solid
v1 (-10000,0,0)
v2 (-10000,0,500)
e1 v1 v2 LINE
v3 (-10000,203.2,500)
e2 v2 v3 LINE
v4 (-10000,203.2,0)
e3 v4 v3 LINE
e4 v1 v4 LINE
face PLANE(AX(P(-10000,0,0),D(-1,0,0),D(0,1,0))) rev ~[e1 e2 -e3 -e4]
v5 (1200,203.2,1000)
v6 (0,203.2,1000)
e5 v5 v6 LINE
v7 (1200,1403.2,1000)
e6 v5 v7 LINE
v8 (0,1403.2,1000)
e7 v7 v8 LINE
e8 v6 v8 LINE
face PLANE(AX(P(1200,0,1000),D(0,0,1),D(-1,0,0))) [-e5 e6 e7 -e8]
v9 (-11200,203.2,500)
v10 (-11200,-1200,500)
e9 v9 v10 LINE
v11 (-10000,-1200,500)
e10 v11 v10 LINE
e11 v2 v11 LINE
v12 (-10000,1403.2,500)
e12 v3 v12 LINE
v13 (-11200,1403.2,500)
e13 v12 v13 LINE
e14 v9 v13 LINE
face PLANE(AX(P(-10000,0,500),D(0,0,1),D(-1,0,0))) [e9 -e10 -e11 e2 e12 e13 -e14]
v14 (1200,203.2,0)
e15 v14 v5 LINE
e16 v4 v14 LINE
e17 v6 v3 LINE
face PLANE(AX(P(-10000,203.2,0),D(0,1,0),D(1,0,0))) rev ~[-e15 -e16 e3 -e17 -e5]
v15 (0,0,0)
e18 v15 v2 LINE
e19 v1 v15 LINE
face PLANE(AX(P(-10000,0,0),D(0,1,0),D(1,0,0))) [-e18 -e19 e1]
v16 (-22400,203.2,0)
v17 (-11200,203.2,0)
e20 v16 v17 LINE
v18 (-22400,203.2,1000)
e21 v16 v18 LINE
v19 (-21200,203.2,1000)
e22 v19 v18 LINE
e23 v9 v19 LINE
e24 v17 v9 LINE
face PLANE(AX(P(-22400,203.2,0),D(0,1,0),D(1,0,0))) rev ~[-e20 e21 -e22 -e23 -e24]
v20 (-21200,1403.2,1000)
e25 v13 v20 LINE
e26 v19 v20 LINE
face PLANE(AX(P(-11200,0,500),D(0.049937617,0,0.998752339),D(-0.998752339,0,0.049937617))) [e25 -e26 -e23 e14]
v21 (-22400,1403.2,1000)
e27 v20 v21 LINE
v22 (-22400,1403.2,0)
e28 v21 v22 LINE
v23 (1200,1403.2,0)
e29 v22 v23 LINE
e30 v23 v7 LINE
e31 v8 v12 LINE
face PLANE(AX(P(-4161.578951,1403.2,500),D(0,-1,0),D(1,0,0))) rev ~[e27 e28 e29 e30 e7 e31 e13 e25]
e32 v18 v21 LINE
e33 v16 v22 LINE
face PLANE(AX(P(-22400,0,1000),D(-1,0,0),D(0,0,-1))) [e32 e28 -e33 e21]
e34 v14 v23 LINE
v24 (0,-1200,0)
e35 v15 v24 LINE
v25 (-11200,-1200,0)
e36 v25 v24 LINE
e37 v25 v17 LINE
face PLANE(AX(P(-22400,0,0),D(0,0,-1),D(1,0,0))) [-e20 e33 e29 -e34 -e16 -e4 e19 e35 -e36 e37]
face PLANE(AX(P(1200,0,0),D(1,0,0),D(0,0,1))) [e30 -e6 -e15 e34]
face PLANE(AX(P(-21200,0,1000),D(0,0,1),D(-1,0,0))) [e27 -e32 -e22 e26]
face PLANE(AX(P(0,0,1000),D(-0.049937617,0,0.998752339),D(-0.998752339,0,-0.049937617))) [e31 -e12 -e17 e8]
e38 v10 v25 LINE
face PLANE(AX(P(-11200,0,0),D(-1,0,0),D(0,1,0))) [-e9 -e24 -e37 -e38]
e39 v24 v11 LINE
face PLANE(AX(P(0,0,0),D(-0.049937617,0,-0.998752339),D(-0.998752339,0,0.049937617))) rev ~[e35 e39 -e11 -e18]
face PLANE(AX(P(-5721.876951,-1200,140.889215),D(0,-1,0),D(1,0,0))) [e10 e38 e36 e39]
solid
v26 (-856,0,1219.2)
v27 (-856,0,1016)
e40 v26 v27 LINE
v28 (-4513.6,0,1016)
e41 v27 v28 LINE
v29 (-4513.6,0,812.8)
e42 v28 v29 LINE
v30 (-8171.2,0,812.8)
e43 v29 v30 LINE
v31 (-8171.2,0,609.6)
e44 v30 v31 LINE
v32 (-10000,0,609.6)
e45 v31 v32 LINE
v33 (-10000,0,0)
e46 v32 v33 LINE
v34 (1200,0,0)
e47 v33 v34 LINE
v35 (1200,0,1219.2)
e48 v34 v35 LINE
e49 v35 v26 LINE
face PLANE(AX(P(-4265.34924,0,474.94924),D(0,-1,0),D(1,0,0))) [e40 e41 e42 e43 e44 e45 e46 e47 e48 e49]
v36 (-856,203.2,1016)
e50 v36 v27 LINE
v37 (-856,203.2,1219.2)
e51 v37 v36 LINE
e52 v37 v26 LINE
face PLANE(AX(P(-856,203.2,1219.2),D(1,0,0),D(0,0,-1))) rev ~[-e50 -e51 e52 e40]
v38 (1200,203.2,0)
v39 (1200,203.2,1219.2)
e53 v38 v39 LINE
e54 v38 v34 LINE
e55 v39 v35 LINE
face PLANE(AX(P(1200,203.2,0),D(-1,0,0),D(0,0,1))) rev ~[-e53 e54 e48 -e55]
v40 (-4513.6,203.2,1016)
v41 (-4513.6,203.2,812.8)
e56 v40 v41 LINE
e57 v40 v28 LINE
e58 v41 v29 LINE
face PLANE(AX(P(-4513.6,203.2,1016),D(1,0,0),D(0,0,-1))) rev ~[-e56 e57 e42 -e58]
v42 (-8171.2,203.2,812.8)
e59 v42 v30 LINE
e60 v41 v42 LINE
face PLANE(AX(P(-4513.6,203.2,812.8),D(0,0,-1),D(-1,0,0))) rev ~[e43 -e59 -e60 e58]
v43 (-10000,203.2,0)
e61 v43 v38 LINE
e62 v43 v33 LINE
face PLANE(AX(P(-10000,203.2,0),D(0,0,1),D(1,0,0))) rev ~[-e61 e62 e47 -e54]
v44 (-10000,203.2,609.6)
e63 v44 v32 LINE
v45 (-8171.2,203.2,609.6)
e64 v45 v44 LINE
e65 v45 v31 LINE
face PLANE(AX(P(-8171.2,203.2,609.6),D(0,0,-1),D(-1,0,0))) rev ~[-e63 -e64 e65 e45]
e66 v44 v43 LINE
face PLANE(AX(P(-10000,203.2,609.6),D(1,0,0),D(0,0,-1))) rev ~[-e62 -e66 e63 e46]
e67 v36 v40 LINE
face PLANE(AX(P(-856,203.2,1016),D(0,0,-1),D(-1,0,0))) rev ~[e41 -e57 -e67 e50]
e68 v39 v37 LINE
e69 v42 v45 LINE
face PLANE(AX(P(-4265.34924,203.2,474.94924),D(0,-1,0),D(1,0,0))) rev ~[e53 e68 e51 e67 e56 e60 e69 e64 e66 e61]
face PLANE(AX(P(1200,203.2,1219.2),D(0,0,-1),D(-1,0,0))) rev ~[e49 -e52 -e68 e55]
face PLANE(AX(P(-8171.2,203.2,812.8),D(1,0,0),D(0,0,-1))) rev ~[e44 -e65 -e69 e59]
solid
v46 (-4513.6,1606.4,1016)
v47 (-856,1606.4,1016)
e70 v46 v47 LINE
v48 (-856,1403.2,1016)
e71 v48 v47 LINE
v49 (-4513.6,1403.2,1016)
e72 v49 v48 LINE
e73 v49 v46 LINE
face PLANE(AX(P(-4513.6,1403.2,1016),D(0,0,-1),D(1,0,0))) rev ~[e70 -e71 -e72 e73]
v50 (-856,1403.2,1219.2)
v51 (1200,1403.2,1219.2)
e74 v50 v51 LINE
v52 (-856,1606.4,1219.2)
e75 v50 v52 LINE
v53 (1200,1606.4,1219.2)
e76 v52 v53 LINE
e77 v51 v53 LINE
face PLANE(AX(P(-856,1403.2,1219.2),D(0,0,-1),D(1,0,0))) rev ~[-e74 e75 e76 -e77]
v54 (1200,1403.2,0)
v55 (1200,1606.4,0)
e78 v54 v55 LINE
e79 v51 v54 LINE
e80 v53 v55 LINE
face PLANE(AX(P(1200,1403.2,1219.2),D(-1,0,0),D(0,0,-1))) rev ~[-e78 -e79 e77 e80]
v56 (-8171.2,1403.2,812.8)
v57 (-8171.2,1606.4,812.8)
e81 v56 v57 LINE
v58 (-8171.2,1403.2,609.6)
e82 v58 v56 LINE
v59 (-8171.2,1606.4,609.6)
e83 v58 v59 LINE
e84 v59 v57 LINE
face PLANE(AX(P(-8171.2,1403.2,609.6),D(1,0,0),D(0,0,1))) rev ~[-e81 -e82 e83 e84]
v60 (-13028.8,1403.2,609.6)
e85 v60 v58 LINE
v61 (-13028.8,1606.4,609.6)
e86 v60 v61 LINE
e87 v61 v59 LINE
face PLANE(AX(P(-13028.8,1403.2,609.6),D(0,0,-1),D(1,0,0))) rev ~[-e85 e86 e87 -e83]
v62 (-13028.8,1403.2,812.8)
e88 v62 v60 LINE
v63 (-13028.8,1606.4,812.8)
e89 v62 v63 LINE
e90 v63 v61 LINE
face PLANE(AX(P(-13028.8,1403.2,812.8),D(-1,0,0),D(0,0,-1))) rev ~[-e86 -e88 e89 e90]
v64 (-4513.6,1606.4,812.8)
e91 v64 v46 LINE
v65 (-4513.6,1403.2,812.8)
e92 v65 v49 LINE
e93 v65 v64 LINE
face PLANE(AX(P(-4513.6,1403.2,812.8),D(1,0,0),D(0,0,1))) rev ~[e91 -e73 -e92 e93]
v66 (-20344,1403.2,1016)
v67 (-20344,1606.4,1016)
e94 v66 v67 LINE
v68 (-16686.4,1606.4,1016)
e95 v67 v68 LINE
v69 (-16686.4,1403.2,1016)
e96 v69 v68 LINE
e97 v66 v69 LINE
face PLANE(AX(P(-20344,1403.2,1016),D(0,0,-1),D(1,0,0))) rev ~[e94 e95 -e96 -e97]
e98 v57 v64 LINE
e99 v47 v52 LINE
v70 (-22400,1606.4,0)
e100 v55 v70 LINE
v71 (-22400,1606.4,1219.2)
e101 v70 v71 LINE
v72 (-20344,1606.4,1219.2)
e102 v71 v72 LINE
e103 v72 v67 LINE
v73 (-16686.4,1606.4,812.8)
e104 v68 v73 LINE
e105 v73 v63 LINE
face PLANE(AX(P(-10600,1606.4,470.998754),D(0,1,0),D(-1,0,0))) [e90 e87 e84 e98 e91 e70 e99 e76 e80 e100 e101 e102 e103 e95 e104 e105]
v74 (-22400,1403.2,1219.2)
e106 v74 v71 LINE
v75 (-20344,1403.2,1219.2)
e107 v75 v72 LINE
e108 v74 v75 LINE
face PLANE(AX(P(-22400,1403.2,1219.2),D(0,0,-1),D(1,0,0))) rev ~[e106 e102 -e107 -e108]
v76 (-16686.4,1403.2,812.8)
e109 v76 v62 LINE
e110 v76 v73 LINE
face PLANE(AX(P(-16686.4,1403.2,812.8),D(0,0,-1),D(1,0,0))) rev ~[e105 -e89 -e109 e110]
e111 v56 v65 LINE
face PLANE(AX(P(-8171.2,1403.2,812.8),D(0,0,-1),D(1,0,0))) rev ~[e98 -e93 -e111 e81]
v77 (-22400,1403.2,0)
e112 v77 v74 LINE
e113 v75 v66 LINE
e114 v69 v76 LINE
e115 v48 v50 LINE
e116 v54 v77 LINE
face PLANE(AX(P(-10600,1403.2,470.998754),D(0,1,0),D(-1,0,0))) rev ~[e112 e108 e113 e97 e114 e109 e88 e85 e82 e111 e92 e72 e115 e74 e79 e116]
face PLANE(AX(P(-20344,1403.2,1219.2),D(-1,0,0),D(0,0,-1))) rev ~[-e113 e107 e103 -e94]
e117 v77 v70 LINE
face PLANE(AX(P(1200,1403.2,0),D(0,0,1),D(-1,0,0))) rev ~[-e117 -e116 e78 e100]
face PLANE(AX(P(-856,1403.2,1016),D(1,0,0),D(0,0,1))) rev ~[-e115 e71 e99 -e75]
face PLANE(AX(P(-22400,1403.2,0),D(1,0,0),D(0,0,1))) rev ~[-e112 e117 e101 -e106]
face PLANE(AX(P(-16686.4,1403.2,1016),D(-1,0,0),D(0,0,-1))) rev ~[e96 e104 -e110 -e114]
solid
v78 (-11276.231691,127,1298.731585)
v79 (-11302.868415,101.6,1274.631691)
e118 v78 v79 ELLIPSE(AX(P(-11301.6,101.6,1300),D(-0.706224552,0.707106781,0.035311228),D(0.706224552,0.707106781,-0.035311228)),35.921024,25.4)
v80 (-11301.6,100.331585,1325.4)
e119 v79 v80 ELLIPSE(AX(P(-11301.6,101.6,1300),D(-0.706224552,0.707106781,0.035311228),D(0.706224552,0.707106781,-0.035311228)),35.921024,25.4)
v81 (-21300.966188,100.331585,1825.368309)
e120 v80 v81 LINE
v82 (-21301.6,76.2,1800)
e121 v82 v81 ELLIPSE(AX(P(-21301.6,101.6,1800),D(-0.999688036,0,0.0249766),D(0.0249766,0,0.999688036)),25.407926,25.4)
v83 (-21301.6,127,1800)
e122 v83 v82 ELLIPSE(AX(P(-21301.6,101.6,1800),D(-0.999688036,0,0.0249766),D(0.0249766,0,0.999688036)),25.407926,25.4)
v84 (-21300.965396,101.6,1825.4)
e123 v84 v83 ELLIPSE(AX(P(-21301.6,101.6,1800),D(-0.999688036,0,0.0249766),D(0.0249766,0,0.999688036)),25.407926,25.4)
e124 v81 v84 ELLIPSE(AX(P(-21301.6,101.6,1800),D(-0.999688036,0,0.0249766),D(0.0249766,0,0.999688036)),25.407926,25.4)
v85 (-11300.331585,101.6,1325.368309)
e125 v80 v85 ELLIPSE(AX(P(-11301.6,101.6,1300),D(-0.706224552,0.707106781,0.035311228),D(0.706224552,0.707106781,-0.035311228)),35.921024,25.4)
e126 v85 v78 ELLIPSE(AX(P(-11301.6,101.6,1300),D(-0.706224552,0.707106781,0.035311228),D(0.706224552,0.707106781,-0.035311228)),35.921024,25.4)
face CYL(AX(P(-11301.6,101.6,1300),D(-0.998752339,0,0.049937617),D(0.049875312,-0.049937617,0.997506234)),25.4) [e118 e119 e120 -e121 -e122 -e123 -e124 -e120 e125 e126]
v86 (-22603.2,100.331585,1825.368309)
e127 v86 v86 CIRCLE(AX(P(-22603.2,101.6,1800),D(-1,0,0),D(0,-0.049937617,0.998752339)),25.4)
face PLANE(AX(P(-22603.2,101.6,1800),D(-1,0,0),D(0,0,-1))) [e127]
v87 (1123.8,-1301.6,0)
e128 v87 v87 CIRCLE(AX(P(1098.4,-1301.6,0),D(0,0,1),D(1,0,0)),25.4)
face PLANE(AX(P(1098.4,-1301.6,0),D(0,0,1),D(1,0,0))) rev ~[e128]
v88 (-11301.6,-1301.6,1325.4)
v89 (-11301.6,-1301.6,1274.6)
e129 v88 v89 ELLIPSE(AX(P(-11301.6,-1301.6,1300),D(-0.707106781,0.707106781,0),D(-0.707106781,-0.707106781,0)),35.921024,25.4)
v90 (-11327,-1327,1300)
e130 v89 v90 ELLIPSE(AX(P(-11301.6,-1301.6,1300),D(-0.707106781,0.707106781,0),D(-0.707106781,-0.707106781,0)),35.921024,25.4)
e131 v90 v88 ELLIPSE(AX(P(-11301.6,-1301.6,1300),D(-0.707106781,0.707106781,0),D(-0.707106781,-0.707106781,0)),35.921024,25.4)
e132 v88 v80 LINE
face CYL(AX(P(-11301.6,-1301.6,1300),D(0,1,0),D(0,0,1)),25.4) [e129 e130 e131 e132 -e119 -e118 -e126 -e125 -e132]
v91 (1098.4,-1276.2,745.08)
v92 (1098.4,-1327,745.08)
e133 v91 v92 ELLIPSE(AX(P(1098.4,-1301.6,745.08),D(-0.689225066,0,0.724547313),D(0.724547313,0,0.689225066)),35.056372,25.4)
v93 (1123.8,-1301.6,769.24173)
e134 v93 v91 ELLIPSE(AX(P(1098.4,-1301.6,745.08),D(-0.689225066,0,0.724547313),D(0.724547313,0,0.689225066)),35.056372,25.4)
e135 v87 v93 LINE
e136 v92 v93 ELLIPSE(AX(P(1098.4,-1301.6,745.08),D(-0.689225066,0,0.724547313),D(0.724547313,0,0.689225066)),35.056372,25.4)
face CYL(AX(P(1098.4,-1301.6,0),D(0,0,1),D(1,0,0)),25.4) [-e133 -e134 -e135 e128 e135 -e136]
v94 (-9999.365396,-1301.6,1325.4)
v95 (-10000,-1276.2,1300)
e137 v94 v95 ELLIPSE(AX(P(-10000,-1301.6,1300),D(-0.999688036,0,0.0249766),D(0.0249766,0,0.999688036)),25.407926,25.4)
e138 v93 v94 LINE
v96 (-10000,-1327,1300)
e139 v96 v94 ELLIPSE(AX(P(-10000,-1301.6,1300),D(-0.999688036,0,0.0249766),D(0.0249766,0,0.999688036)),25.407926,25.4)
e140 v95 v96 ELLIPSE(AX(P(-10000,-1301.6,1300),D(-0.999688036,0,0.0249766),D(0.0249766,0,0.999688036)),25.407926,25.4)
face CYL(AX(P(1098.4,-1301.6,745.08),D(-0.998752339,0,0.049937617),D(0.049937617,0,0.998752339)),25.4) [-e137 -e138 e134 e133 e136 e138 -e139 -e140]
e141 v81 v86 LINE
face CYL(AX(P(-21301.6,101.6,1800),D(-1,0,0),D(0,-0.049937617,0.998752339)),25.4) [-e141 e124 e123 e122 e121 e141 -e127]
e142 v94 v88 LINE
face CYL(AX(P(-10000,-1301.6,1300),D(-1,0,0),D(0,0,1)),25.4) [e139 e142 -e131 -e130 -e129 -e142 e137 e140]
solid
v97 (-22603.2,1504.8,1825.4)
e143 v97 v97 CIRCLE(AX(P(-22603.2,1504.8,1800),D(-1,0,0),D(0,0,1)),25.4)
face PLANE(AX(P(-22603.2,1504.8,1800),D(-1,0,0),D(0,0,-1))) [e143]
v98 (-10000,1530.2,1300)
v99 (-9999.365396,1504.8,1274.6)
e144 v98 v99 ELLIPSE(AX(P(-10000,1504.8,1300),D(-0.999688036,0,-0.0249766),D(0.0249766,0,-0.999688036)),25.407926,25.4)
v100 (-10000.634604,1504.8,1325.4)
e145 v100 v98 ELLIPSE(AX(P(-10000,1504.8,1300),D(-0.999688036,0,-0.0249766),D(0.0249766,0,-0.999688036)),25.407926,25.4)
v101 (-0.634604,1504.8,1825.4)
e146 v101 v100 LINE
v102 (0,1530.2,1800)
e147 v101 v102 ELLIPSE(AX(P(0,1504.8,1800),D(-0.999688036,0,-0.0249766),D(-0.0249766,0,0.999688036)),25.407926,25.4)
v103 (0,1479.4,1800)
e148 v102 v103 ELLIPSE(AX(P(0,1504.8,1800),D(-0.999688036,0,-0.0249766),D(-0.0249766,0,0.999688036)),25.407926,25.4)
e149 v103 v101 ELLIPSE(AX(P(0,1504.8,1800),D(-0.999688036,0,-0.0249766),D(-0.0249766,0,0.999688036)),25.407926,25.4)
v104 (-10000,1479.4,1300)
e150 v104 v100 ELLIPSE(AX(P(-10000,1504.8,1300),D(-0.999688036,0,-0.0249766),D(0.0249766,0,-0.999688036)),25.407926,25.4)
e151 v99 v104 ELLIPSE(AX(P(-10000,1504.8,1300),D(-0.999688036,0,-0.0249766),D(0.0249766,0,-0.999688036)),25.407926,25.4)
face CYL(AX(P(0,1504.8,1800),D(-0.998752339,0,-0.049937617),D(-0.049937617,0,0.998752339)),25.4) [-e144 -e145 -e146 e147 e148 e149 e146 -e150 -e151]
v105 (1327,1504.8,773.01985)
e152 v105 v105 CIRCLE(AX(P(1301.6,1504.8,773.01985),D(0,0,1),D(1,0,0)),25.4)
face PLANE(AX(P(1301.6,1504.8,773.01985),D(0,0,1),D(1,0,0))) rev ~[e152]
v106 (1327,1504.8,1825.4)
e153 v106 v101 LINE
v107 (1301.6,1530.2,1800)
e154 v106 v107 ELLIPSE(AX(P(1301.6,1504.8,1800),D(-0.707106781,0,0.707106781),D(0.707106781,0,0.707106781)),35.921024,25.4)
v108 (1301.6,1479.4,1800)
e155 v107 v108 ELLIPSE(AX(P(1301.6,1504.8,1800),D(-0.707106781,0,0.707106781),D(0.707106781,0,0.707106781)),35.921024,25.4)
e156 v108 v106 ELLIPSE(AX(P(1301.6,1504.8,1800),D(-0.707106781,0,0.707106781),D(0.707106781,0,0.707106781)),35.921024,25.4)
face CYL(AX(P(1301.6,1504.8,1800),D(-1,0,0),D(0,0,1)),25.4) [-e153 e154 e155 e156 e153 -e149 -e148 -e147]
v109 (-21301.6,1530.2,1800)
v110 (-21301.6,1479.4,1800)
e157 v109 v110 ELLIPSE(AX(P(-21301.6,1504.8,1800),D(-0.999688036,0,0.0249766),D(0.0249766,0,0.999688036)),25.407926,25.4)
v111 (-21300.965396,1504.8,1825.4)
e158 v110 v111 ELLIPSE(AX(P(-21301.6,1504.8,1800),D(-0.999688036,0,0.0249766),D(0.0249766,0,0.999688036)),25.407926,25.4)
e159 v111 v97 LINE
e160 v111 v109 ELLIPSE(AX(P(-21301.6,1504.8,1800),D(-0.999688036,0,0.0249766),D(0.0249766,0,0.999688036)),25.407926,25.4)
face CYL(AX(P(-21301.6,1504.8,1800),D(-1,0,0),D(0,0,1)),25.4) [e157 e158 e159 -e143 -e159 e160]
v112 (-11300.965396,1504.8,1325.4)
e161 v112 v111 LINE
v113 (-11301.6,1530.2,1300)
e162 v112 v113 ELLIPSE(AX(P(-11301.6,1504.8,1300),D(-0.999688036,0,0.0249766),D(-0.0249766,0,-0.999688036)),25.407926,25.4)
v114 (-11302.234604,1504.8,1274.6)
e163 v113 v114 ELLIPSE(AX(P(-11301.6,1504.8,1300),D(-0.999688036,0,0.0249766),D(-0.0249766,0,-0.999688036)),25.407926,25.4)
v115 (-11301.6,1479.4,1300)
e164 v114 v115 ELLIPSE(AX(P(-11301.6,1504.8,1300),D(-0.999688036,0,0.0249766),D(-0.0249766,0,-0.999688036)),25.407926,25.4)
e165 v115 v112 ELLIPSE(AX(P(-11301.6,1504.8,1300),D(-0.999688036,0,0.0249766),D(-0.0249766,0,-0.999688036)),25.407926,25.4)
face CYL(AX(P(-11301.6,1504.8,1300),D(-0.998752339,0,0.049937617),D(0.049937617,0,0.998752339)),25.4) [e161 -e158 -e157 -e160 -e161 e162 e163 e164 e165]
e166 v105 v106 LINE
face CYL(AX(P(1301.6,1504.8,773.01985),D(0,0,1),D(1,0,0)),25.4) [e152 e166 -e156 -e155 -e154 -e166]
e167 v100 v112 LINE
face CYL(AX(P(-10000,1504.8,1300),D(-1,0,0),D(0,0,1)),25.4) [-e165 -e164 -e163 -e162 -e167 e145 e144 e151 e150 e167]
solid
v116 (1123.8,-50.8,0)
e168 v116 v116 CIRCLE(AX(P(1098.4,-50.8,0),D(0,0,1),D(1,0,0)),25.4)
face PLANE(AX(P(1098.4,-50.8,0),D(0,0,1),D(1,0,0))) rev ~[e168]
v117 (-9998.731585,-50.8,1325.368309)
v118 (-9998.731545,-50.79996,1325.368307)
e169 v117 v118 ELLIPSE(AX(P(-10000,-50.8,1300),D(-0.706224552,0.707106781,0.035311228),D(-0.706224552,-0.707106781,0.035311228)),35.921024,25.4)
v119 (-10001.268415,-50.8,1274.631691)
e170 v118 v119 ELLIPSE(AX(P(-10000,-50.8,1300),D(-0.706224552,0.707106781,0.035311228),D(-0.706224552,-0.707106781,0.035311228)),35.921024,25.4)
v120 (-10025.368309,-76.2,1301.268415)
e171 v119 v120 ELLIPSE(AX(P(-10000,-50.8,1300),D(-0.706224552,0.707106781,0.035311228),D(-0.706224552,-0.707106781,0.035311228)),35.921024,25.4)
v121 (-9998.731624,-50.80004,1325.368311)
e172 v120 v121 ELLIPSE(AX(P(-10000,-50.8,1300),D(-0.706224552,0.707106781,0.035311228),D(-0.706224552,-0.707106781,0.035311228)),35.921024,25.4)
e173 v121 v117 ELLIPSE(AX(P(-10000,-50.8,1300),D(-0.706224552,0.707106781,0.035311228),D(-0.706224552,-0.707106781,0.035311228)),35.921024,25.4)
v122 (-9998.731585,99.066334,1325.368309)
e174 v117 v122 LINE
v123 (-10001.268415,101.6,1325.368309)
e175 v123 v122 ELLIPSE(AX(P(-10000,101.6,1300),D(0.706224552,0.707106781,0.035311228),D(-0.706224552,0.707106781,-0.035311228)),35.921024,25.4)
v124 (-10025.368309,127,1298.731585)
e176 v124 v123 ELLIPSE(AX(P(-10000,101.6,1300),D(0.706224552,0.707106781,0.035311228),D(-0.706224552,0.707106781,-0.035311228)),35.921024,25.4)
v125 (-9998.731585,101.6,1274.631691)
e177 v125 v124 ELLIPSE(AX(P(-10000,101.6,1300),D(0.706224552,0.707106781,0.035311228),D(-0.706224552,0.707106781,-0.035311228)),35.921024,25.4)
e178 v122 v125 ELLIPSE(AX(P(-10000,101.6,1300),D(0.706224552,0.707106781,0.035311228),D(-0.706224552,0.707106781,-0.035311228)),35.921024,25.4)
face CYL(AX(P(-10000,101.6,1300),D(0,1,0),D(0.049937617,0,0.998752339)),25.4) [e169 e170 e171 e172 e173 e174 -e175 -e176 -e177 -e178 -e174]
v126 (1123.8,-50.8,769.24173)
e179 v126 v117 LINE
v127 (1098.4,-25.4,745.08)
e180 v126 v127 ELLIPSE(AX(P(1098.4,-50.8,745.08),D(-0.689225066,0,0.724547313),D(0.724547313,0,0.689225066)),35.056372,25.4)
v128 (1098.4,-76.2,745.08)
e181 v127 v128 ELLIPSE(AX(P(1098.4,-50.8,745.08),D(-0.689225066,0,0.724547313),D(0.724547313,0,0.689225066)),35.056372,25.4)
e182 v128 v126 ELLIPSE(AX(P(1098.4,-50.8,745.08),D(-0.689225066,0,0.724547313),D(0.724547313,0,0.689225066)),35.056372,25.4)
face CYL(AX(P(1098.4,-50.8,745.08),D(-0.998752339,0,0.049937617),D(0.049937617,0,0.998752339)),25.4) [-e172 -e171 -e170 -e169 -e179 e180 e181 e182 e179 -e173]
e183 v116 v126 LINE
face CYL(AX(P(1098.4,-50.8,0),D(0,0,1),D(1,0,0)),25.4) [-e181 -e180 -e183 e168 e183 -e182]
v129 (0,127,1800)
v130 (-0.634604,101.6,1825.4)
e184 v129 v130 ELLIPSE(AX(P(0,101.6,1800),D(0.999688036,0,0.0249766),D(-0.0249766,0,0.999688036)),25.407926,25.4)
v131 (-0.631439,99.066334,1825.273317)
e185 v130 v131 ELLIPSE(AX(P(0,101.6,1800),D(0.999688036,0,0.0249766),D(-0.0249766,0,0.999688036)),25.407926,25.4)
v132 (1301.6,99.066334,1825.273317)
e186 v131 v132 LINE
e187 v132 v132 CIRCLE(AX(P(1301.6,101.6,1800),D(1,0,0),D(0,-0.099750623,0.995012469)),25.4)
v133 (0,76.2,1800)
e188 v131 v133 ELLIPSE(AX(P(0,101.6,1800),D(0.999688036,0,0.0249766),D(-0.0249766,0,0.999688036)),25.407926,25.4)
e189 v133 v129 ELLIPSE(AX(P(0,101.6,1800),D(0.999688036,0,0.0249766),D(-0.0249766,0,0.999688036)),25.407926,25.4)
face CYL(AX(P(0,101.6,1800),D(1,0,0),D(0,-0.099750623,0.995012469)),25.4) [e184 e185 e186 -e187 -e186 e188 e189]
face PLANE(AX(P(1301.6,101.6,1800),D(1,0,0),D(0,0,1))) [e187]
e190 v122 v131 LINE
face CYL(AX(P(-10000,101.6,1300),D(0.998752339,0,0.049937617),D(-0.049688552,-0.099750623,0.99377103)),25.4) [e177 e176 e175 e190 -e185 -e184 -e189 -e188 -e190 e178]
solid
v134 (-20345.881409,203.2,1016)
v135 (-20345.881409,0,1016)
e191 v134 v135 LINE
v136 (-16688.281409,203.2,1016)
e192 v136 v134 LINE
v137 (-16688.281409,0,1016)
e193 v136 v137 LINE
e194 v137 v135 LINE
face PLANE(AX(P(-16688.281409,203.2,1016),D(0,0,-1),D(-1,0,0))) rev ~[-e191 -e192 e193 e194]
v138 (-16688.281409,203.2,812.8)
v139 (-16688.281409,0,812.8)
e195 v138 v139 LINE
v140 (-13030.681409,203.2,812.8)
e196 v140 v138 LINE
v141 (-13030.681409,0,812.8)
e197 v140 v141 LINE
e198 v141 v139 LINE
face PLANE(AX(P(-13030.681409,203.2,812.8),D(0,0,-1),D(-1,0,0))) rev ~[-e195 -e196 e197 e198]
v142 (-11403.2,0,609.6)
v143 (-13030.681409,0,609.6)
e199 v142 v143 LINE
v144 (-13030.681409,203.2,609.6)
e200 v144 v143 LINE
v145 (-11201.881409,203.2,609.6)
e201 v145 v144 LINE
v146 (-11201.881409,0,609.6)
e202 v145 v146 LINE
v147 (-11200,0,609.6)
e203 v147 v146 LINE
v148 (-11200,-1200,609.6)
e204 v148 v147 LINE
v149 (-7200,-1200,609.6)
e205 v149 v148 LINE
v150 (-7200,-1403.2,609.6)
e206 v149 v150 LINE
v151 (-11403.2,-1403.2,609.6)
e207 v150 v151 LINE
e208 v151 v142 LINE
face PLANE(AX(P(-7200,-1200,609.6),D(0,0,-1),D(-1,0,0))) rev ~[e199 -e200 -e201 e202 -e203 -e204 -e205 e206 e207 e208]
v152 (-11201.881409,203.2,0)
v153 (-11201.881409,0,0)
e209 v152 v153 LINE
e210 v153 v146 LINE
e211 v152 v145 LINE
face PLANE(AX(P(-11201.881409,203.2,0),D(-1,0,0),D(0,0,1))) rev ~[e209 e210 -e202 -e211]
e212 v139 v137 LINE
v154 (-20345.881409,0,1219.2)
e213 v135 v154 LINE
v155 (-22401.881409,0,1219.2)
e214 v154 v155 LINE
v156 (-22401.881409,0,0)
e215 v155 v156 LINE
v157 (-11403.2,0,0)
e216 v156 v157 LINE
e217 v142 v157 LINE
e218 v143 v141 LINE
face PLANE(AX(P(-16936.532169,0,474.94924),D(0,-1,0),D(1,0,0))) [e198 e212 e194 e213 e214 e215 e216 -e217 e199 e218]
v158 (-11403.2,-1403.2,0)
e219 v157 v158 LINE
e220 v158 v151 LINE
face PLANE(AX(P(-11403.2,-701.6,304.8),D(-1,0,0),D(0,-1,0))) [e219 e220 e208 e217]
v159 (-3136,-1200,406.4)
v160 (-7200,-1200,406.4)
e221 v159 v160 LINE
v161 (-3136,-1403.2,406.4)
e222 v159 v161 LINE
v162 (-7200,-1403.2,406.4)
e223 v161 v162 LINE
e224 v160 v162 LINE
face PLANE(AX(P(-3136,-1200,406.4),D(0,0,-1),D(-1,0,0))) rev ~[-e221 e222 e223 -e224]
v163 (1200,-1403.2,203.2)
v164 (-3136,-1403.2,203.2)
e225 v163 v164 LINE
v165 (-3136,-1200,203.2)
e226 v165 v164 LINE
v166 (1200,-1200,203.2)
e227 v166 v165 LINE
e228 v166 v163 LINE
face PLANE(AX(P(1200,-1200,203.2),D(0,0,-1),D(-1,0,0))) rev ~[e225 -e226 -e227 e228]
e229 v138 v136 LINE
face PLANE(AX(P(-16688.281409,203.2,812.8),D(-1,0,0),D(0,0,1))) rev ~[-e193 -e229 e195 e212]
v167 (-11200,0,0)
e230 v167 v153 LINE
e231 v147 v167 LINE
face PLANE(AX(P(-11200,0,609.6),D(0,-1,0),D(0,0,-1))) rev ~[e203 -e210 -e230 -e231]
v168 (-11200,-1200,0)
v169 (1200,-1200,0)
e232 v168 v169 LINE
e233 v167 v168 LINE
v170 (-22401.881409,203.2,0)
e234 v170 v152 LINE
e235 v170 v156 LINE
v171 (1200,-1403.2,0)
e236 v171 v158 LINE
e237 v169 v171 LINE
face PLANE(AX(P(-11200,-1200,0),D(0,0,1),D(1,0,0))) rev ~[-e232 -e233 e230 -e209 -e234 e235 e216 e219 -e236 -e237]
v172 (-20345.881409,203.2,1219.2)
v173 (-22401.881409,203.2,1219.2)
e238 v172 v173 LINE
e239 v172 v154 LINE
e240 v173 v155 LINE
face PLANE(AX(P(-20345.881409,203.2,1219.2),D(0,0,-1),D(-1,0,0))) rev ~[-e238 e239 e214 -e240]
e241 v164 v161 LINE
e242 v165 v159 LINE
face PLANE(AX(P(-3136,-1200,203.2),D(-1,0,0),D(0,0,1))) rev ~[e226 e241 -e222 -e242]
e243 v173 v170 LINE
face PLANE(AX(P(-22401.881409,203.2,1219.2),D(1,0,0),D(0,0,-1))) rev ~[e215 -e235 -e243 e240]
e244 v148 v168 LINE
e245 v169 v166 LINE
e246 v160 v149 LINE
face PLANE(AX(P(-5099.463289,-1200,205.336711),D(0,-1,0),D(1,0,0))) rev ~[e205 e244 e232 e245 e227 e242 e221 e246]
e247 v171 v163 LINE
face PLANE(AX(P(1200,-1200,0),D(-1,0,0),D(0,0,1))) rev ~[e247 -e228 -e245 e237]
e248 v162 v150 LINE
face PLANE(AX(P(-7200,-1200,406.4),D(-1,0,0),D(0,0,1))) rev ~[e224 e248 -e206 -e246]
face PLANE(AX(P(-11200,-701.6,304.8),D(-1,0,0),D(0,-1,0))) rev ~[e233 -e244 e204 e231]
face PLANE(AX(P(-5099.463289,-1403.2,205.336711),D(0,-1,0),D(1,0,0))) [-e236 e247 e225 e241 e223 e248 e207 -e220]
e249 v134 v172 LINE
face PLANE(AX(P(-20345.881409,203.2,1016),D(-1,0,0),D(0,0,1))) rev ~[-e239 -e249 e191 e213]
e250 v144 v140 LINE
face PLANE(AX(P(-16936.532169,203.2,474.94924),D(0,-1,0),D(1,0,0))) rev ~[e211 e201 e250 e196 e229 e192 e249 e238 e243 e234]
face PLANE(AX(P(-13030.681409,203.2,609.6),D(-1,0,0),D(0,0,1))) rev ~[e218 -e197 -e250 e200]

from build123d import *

# Parameters (mm, degrees)
F1_DEPTH  = 1200
F2_DEPTH  = 1403.2
F3_W      = 11200
F3_H      = 203.2
F4_DEPTH  = 1000.001
F7_DEPTH  = 203.2
F9_DEPTH  = 203.2
F11_DEPTH = 203.2
F13_DEPTH = 203.2
F24_R     = 25.4
F26_R     = 25.4
F29_R     = 25.4


# Not quite as in the source:
# - the program builds the solid bodies; features that only make, move or delete a surface that nothing else refers to are left out


with BuildPart() as f1:
    # F0 (on Front) → F1 (new body)
    with BuildSketch(Plane.XZ):
        Polygon((-10000, 0), (0, 0), (-10000, 500), (-11200, 500), (-11200, 0), align=None)
    extrude(amount=F1_DEPTH)

    # F0 (on Front) → F2 (join)
    with BuildSketch(Plane.XZ):
        Polygon((-10000, 500), (0, 0), (1200, 0), (1200, 1000), (0, 1000), align=None)
        Polygon((-10000, 0), (0, 0), (-10000, 500), (-11200, 500), (-11200, 0), align=None)
        Polygon((-21200, 0), (-11200, 0), (-11200, 500), (-21200, 1000), (-22400, 1000), (-22400, 0), align=None)
    extrude(amount=-F2_DEPTH)

    # F3 (on Top) → F4 (cut, through all)
    with BuildSketch(Plane.XY):
        with Locations((-4400, 101.6)):
            Rectangle(F3_W, F3_H)
        with Locations((-16800, 101.6)):
            Rectangle(F3_W, F3_H)
    extrude(amount=F4_DEPTH, mode=Mode.SUBTRACT)


with BuildPart() as f7:
    # F6 (on face) → F7 (new body)
    with BuildSketch(Plane.XZ.offset(-203.2)):
        Polygon((-10000, 609.6), (-10000, 0), (1200, 0), (1200, 1219.2), (-856, 1219.2), (-856, 1016), (-4513.6, 1016), (-4513.6, 812.8), (-8171.2, 812.8), (-8171.2, 609.6), align=None)
    extrude(amount=F7_DEPTH)


with BuildPart() as f7b:
    # F6 (on face) → F7, piece 2 (new body)
    with BuildSketch(Plane.XZ.offset(-203.2)):
        Polygon((-16688.2814086914, 1016), (-20345.8814086914, 1016), (-20345.8814086914, 1219.2), (-22401.8814086914, 1219.2), (-22401.8814086914, 0), (-11201.8814086914, 0), (-11201.8814086914, 609.6), (-13030.6814086914, 609.6), (-13030.6814086914, 812.8), (-16688.2814086914, 812.8), align=None)
    extrude(amount=F7_DEPTH)

    # F10 (on face) → F11 (join)
    with BuildSketch(Plane(origin=(-11200, 0, 0), x_dir=(0, -1, 0), z_dir=(-1, 0, 0))):
        Polygon((0, 609.6), (0, 0), (1200, 0), (1403.2, 0), (1403.2, 609.6), (1200, 609.6), align=None)
    extrude(amount=F11_DEPTH)

    # F12 (on face) → F13 (join)
    with BuildSketch(Plane.XZ.offset(1200)):
        Polygon((-11200, 609.6), (-11200, 500), (-11200, 0), (1200, 0), (1200, 203.2), (928, 203.2), (-3136, 203.2), (-3136, 406.4), (-7200, 406.4), (-7200, 609.6), align=None)
    extrude(amount=F13_DEPTH)


with BuildPart() as f9:
    # F8 (on face) → F9 (new body)
    with BuildSketch(Plane(origin=(0, 1403.2, 0), x_dir=(-1, 0, 0), z_dir=(0, 1, 0))):
        Polygon((11200, 609.6), (10000, 609.6), (8171.2, 609.6), (8171.2, 812.8), (4513.6, 812.8), (4513.6, 1016), (856, 1016), (856, 1219.2), (-1200, 1219.2), (-1200, 0), (10000, 0), (11200, 0), (22400, 0), (22400, 1219.2), (20344, 1219.2), (20344, 1016), (16686.4, 1016), (16686.4, 812.8), (13028.8, 812.8), (13028.8, 609.6), align=None)
    extrude(amount=F9_DEPTH)


with BuildPart() as f25:
    # F25: sweep along a path in F15, F18, F21
    with BuildLine(Plane.XZ.offset(1301.6)) as f25_path:
        Line((1098.4, 0), (1098.4, 745.08))
        Line((1098.4, 745.08), (-10000, 1300))
    with BuildLine(Plane.XY.offset(1300)) as f25_path_2:
        Line((-10000, -1301.6), (-11301.6, -1301.6))
        Line((-11301.6, -1301.6), (-11301.6, 101.6))
    with BuildLine(Plane.XZ.offset(-101.6)) as f25_path_3:
        Line((-11301.6, 1300), (-21301.6, 1800))
        Line((-21301.6, 1800), (-22603.2, 1800))
    # F24 (on Top) → F25 (sweep)
    with BuildSketch(Plane.XY):
        with Locations((1098.4, -1301.6)):
            Circle(F24_R)
    sweep(path=f25_path.line + f25_path_2.line + f25_path_3.line, transition=Transition.RIGHT)


with BuildPart() as f27:
    # F27: sweep along a path in F23, F18, F21
    with BuildLine(Plane.XZ.offset(50.8)) as f27_path:
        Line((1098.4, 0), (1098.4, 745.08))
        Line((1098.4, 745.08), (-10000, 1300))
    with BuildLine(Plane.XY.offset(1300)) as f27_path_2:
        Line((-10000, 101.6), (-10000, -50.8))
    with BuildLine(Plane.XZ.offset(-101.6)) as f27_path_3:
        Line((-10000, 1300), (0, 1800))
        Line((0, 1800), (1301.6, 1800))
    # F26 (on Top) → F27 (sweep)
    with BuildSketch(Plane.XY):
        with Locations((1098.4, -50.8)):
            Circle(F26_R)
    sweep(path=f27_path.line + f27_path_2.line + f27_path_3.line, transition=Transition.RIGHT)


with BuildPart() as f30:
    # F30: sweep along a path in F30_path
    with BuildLine(Plane(origin=(1301.6, 1504.8, 1800), x_dir=(0, 0, 1), z_dir=(0, -1, 0))) as f30_path:
        Line((-1026.9801497459, 0), (0, 0))
        Line((0, 0), (0, 1301.6))
        Line((0, 1301.6), (-500, 11301.6))
        Line((-500, 11301.6), (-500, 12603.2))
        Line((-500, 12603.2), (0, 22603.2))
        Line((0, 22603.2), (0, 23904.8))
    # F29 (on plane+point) → F30 (sweep)
    with BuildSketch(Plane.XY.offset(773.0198502541)):
        with Locations((1301.6, 1504.8)):
            Circle(F29_R)
    sweep(path=f30_path.line, transition=Transition.RIGHT)


solid = Compound([f1.part, f7.part, f7b.part, f9.part, f25.part, f27.part, f30.part])
